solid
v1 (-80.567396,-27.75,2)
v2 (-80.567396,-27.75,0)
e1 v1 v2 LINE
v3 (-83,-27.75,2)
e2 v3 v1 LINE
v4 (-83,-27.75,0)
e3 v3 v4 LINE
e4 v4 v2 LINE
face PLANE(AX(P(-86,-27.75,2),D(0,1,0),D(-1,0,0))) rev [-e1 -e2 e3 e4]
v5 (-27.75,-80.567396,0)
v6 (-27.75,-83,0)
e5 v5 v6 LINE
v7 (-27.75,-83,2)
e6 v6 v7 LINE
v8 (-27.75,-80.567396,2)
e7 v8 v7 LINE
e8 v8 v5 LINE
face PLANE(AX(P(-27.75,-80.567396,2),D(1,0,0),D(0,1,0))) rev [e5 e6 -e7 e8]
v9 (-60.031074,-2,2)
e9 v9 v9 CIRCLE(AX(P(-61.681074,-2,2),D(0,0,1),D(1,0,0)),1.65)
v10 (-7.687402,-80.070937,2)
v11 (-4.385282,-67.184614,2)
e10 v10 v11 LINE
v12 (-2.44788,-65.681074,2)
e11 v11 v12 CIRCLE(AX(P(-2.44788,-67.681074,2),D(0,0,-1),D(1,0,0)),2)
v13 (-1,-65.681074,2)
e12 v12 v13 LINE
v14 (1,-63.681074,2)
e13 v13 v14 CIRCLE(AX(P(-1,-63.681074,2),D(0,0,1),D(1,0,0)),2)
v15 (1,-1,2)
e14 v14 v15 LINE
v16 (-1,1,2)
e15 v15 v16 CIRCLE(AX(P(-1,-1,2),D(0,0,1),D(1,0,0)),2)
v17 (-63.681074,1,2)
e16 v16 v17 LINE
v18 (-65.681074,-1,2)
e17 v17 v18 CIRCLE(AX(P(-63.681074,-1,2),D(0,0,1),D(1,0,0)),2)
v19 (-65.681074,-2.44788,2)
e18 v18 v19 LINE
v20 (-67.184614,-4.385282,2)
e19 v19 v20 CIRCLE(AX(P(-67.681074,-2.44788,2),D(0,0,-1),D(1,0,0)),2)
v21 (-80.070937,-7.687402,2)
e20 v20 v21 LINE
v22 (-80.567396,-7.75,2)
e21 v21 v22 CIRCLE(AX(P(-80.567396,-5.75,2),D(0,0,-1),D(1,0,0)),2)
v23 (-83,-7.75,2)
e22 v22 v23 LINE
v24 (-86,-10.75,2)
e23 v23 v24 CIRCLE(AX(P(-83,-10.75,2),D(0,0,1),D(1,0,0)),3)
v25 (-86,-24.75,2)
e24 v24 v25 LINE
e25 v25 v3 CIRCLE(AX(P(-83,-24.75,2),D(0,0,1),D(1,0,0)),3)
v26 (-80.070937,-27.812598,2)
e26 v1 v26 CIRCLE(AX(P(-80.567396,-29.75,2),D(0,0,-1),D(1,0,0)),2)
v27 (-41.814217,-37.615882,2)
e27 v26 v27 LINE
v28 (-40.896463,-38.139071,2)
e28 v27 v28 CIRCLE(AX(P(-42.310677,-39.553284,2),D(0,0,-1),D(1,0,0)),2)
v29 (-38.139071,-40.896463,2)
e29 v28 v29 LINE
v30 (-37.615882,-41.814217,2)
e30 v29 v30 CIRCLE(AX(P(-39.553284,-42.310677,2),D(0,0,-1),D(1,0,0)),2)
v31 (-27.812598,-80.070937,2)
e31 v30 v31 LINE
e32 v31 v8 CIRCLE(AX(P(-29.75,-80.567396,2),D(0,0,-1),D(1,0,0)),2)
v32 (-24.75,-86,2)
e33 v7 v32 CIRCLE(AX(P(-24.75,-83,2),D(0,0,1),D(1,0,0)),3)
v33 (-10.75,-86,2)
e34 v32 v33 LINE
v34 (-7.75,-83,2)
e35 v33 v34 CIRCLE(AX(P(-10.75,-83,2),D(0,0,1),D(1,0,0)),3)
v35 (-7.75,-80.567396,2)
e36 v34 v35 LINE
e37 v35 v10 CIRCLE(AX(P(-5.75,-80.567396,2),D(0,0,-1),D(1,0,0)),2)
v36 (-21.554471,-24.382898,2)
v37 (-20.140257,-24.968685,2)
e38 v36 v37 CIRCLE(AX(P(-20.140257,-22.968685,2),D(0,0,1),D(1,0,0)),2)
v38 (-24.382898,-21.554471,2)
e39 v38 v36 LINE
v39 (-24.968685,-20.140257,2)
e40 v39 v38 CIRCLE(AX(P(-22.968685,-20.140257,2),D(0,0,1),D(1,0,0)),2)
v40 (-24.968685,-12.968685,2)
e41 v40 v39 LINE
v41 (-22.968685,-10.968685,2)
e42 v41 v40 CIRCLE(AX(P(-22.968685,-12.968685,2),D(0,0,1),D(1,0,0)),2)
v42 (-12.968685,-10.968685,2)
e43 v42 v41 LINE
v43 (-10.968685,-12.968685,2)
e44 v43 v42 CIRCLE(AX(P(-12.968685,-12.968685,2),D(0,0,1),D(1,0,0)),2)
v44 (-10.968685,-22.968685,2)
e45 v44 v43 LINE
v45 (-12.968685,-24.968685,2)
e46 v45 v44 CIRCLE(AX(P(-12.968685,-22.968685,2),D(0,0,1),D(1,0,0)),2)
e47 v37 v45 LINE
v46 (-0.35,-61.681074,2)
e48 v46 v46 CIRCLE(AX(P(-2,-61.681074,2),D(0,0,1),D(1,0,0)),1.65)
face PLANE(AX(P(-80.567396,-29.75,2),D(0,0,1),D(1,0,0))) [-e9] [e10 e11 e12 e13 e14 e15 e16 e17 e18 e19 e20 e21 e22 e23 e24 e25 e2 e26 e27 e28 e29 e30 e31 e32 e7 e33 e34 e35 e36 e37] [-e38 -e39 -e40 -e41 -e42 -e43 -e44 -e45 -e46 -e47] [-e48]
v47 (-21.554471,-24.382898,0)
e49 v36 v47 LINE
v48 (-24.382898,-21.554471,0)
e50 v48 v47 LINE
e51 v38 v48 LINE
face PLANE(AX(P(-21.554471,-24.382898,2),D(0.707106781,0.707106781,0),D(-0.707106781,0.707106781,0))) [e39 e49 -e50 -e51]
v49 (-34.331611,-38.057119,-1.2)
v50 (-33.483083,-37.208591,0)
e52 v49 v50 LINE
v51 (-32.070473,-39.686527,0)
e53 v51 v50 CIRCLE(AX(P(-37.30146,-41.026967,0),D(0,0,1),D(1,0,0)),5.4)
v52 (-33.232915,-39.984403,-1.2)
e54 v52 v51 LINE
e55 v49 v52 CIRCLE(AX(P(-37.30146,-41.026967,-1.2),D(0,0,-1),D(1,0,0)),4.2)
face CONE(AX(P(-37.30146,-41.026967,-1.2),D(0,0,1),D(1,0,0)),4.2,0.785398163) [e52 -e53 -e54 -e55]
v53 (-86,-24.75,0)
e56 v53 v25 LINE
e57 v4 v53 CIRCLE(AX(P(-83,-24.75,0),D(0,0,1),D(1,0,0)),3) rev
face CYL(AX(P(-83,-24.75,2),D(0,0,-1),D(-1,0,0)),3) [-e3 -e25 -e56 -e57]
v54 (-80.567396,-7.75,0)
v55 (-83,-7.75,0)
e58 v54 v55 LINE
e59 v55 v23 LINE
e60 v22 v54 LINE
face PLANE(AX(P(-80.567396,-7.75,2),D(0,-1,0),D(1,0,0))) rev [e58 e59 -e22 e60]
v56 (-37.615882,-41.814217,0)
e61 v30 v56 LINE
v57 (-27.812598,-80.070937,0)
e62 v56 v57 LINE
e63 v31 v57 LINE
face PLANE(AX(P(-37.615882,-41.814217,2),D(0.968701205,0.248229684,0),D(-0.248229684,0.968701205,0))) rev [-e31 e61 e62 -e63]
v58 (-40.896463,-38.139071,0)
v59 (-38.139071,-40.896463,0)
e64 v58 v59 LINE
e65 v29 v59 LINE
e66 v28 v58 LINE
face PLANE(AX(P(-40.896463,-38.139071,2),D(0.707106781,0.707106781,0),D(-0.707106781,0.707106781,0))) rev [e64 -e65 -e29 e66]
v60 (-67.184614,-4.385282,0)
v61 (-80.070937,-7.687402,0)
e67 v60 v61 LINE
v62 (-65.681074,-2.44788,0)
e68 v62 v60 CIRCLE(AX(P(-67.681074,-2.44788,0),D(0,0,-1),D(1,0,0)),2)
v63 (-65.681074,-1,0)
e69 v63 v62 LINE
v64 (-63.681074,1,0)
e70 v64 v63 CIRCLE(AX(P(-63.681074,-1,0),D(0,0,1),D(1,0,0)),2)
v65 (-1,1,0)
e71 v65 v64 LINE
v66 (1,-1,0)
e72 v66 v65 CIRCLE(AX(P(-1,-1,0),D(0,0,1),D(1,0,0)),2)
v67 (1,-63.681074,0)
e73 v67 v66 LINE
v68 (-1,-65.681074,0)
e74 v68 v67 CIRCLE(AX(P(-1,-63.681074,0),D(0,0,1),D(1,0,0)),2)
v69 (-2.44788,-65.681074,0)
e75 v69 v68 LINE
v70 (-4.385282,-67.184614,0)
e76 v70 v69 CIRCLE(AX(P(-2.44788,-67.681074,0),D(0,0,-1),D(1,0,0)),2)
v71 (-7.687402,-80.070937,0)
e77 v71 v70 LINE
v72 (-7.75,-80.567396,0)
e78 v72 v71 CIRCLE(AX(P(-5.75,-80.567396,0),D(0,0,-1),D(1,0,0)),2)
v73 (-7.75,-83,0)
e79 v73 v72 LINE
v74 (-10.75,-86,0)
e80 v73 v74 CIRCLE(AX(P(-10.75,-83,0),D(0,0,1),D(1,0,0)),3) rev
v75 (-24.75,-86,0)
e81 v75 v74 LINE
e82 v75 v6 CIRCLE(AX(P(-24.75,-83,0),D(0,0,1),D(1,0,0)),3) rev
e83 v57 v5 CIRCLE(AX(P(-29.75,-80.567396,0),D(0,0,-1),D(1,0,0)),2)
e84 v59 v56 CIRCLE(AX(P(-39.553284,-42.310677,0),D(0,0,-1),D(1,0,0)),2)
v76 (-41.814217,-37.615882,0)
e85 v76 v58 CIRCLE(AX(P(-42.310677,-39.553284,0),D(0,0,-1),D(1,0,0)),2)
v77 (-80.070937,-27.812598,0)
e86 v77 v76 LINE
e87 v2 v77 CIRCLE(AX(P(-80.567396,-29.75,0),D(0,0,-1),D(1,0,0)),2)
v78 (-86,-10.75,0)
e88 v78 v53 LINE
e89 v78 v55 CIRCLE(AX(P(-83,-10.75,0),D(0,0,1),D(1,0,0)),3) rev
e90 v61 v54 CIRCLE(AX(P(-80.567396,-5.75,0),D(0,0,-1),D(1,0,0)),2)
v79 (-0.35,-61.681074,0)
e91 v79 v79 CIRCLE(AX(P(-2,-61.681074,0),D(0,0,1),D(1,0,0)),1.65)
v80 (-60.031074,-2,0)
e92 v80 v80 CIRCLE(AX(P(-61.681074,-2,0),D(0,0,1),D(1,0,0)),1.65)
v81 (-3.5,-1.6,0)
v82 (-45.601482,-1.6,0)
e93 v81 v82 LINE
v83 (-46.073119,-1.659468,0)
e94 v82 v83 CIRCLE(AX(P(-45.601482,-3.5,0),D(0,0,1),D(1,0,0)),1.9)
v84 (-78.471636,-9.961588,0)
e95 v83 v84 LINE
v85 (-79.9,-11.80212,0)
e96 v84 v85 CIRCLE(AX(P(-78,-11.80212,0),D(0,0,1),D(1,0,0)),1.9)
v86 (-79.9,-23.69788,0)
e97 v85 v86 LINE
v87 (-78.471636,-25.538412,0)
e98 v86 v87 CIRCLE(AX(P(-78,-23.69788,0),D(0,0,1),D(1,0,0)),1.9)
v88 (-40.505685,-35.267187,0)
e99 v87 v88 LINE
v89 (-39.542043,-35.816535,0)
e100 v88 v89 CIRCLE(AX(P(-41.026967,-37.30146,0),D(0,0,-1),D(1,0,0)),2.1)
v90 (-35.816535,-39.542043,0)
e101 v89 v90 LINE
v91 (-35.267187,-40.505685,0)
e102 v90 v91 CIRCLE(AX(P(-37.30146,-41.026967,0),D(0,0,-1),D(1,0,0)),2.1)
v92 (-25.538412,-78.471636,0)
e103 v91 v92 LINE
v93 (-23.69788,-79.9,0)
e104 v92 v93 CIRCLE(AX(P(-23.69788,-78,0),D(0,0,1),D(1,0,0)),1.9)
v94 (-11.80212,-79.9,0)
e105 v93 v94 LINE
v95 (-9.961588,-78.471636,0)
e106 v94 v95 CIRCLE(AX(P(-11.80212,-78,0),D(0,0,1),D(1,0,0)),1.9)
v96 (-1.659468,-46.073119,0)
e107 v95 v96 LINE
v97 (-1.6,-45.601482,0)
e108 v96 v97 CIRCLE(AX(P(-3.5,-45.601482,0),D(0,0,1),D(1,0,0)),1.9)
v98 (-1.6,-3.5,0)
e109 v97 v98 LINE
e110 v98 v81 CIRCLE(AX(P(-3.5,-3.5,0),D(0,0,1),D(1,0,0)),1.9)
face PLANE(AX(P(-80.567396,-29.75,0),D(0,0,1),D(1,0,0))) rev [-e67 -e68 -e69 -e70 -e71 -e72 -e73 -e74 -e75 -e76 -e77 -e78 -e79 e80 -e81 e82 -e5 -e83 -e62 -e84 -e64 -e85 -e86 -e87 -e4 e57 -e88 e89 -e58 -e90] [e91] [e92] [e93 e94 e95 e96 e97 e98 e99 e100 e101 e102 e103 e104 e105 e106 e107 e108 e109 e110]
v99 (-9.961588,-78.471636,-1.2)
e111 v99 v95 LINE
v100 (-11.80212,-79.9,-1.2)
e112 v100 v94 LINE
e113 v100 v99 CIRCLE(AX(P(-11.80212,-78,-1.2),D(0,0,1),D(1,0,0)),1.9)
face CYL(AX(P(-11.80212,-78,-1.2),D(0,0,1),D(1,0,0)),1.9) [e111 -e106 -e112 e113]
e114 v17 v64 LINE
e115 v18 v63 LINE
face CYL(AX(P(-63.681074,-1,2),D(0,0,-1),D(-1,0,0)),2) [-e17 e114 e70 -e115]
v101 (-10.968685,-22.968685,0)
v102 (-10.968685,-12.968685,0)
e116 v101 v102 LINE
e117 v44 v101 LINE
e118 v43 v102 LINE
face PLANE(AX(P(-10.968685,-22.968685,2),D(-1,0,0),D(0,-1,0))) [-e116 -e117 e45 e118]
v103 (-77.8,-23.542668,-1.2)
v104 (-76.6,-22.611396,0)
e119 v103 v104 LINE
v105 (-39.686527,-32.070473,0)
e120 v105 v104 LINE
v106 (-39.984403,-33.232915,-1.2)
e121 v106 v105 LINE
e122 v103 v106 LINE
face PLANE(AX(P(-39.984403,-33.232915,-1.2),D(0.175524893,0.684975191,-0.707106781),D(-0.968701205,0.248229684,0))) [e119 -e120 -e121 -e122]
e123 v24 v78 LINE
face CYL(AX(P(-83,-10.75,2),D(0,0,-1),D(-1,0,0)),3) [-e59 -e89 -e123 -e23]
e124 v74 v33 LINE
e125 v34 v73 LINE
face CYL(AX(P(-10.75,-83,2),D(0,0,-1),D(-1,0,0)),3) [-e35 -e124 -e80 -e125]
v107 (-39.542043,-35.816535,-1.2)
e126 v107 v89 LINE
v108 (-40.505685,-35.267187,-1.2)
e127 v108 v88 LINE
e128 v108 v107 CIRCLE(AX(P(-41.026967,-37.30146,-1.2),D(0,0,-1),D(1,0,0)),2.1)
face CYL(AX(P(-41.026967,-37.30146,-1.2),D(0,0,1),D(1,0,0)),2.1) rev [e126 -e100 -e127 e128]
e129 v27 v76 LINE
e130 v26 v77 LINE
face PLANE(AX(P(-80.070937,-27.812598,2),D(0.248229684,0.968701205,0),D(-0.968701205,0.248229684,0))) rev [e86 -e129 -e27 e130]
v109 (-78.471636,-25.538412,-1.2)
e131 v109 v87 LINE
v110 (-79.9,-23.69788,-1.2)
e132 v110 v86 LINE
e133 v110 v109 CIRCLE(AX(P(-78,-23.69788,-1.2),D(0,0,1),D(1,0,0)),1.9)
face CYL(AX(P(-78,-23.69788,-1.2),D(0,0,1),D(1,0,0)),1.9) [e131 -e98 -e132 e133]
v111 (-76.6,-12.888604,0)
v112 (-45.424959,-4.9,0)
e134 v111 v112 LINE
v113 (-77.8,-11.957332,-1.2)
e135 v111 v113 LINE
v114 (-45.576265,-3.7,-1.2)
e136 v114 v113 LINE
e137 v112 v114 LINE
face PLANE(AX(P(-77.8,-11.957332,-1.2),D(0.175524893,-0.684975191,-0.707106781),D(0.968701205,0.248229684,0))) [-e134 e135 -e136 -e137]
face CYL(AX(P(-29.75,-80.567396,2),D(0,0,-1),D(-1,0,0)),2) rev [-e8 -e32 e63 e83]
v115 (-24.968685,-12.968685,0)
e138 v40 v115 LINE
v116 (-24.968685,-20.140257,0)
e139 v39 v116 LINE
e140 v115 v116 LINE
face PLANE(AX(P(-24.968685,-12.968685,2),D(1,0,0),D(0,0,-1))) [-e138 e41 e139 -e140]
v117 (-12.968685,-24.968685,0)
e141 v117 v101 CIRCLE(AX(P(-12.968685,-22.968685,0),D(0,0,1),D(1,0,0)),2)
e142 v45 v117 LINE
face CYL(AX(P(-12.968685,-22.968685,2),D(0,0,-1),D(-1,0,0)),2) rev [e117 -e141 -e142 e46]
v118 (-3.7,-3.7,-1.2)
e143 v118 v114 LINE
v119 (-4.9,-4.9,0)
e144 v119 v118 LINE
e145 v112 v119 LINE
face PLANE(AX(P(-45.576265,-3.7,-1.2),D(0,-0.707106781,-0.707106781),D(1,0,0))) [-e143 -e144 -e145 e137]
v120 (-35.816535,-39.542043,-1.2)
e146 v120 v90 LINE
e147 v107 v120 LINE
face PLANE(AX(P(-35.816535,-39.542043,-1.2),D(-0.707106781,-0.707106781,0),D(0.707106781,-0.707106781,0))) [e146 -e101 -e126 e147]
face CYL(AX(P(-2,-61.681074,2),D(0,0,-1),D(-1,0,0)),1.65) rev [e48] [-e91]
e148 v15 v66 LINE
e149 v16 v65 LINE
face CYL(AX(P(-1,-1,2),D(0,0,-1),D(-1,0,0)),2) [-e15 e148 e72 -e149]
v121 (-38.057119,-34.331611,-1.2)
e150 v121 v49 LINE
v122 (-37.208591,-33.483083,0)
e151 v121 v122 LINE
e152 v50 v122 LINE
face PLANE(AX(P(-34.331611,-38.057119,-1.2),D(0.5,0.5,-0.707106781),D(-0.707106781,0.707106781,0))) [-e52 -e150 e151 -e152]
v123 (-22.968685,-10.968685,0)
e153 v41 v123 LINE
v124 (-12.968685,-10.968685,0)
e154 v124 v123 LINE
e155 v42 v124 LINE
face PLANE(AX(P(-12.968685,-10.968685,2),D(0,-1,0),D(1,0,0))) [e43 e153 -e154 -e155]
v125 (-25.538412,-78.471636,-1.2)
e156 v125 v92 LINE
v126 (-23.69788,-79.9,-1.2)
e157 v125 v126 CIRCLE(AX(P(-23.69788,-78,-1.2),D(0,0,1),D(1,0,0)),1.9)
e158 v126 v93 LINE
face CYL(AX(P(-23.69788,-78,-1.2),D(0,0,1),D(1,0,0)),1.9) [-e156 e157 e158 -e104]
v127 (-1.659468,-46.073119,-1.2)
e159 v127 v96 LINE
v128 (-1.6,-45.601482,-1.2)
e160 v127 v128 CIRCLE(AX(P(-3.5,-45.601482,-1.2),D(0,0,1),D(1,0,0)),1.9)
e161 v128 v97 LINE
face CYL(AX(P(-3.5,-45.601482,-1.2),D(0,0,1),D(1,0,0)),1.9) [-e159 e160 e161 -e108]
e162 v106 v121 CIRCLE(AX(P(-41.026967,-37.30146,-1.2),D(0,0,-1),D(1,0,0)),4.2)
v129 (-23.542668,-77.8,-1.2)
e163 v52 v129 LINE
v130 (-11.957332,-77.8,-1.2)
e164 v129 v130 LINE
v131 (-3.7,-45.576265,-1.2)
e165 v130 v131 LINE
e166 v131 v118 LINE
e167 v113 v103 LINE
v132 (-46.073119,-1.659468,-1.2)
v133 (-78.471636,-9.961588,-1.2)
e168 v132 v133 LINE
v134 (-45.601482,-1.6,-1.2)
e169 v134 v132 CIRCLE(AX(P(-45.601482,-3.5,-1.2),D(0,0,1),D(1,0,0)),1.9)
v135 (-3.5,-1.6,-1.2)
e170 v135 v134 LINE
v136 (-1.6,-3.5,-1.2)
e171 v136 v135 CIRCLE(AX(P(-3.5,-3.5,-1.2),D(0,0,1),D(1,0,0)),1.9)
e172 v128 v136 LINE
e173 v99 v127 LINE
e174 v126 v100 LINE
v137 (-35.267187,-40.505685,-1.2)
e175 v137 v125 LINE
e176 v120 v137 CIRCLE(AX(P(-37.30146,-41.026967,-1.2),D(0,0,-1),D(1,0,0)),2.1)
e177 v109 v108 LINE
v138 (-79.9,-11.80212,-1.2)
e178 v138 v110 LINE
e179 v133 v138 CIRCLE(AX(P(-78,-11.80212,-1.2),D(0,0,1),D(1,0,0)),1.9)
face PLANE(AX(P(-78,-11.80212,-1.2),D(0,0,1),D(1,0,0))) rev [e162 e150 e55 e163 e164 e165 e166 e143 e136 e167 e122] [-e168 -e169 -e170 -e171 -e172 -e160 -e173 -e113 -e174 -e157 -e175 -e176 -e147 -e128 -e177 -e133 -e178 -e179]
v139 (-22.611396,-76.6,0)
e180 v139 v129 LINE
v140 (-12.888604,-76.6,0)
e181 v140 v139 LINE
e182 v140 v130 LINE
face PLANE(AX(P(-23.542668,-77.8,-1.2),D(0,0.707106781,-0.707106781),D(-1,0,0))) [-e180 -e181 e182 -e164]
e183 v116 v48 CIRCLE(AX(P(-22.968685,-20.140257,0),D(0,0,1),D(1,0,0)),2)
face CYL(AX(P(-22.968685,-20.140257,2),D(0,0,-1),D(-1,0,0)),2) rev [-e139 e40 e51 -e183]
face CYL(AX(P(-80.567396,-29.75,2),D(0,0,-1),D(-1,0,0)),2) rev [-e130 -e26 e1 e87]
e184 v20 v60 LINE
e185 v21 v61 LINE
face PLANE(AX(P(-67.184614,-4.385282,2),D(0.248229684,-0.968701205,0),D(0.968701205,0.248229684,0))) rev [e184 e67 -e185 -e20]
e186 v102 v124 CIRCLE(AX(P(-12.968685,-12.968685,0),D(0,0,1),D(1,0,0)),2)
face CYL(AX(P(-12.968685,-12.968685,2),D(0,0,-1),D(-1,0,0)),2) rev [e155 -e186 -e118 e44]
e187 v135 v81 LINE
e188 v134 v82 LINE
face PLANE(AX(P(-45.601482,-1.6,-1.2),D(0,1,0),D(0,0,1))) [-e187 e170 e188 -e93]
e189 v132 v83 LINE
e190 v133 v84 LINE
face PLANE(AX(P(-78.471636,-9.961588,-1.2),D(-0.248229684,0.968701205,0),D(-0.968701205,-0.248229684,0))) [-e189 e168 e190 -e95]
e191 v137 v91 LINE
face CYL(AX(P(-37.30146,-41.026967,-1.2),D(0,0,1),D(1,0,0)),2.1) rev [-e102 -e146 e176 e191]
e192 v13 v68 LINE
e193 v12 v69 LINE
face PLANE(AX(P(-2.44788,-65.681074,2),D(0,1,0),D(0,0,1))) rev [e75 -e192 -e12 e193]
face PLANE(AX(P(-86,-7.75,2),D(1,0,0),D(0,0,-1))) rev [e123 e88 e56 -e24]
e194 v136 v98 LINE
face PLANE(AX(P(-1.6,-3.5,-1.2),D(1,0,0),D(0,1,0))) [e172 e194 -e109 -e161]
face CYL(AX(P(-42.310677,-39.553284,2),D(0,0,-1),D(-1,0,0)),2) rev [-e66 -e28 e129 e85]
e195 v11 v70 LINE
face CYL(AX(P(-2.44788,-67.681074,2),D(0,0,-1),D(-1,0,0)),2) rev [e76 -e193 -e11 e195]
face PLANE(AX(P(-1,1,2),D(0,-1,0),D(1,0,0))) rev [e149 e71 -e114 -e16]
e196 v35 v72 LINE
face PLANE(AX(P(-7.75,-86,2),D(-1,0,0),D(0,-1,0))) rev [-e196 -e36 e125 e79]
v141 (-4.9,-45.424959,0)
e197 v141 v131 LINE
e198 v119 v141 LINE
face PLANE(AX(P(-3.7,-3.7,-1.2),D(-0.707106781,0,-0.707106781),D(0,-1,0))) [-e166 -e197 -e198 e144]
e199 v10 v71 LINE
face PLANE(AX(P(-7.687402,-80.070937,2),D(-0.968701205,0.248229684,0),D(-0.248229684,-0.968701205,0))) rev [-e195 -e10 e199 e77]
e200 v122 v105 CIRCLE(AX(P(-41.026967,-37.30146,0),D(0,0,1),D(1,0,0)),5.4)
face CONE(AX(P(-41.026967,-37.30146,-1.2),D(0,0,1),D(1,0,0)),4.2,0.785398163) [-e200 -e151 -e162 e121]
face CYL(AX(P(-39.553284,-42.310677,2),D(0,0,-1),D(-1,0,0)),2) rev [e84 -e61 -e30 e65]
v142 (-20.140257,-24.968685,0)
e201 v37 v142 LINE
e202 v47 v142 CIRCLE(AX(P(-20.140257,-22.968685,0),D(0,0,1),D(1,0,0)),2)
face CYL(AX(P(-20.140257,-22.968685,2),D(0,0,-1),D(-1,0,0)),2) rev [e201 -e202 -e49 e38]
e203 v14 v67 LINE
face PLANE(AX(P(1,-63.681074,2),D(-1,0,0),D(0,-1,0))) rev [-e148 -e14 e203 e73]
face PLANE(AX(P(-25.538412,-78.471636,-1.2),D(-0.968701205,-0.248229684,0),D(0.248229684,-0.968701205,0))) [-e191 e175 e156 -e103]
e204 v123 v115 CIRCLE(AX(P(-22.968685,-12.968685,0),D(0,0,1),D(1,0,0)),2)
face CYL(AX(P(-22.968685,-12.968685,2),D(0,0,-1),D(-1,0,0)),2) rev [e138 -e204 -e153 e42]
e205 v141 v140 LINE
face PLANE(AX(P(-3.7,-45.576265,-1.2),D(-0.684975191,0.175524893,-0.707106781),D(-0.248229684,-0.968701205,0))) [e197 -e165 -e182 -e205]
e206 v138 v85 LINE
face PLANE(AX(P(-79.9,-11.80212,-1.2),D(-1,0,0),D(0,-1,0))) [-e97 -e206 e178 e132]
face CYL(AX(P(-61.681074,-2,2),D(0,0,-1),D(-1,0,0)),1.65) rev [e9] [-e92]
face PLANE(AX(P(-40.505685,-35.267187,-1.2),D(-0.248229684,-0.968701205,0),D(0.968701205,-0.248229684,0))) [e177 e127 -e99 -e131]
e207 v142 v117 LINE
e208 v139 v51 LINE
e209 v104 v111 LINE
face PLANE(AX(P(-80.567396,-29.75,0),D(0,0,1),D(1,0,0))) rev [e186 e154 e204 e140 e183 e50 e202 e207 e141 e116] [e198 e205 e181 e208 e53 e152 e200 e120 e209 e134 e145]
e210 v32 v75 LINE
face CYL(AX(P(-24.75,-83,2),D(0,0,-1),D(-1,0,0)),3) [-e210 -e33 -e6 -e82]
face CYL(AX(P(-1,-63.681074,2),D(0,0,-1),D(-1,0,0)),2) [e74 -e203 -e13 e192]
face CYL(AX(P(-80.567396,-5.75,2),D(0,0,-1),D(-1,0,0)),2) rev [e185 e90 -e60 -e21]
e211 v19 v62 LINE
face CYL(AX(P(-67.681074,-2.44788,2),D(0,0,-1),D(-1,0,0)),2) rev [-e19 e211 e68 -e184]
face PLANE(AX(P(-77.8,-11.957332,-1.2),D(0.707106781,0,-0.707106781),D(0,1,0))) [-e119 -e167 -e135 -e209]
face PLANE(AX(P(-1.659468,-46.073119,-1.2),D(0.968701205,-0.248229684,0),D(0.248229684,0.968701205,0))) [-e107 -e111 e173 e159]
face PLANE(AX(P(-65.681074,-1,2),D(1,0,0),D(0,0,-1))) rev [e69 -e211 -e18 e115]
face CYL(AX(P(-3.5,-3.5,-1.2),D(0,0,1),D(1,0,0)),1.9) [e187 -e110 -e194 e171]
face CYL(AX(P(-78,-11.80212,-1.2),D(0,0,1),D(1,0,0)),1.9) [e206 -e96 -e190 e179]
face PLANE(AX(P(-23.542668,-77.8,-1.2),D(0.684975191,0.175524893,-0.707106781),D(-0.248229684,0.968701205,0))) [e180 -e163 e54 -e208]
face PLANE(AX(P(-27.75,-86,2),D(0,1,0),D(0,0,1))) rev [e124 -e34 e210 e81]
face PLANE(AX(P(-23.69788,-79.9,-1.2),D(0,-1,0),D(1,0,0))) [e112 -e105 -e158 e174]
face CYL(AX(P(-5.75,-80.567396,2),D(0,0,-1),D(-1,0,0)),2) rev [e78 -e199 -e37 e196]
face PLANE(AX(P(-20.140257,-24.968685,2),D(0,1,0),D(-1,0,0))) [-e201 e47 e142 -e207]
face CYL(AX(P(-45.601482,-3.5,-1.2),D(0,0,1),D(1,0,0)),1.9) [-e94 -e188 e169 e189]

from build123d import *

# Parameters (mm, degrees)
BOSS_EXTRUDE1_DEPTH = 2
CUT_EXTRUDE2_DEPTH  = 122.638809596
BOSS_EXTRUDE2_DEPTH = 1.2
CHAMFER1_SIZE       = 1.2
SKETCH2_R           = 1.65
CUT_EXTRUDE3_DEPTH  = 122.638809596
FILLET1_R           = 3


with BuildPart() as part:
    # Sketch1 → Boss-Extrude1 (new body)
    with BuildSketch(Plane.XY):
        with BuildLine():
            Line((-86, -7.75), (-86, -27.75))
            Line((-86, -27.75), (-80.567396197, -27.75))
            ThreePointArc((-80.567396197, -27.75), (-80.317201092, -27.765711107), (-80.07093683, -27.81259759))
            Line((-80.07093683, -27.81259759), (-41.814217278, -37.615881976))
            ThreePointArc((-41.814217278, -37.615881976), (-41.320172025, -37.815786012), (-40.896463083, -38.139070823))
            Line((-40.896463083, -38.139070823), (-38.139070823, -40.896463083))
            ThreePointArc((-38.139070823, -40.896463083), (-37.815786012, -41.320172025), (-37.615881976, -41.814217278))
            Line((-37.615881976, -41.814217278), (-27.81259759, -80.07093683))
            ThreePointArc((-27.81259759, -80.07093683), (-27.765711107, -80.317201092), (-27.75, -80.567396197))
            Line((-27.75, -80.567396197), (-27.75, -86))
            Line((-27.75, -86), (-7.75, -86))
            Line((-7.75, -86), (-7.75, -80.567396197))
            ThreePointArc((-7.75, -80.567396197), (-7.734288893, -80.317201092), (-7.68740241, -80.07093683))
            Line((-7.68740241, -80.07093683), (-4.385282287, -67.184614401))
            ThreePointArc((-4.385282287, -67.184614401), (-3.674069354, -66.101054981), (-2.447879878, -65.681073768))
            Line((-2.447879878, -65.681073768), (-1, -65.681073768))
            ThreePointArc((-1, -65.681073768), (0.414213562, -65.09528733), (1, -63.681073768))
            Line((1, -63.681073768), (1, -1))
            ThreePointArc((1, -1), (0.414213562, 0.414213562), (-1, 1))
            Line((-1, 1), (-63.681073768, 1))
            ThreePointArc((-63.681073768, 1), (-65.09528733, 0.414213562), (-65.681073768, -1))
            Line((-65.681073768, -1), (-65.681073768, -2.447879878))
            ThreePointArc((-65.681073768, -2.447879878), (-66.101054981, -3.674069354), (-67.184614401, -4.385282287))
            Line((-67.184614401, -4.385282287), (-80.07093683, -7.68740241))
            ThreePointArc((-80.07093683, -7.68740241), (-80.317201092, -7.734288893), (-80.567396197, -7.75))
            Line((-80.567396197, -7.75), (-86, -7.75))
        make_face()
    extrude(amount=BOSS_EXTRUDE1_DEPTH)

    # Sketch4 → Cut-Extrude2 (cut, through all)
    with BuildSketch(Plane.XY):
        with BuildLine():
            Line((-24.968684618, -12.968684618), (-24.968684618, -20.140257493))
            ThreePointArc((-24.968684618, -20.140257493), (-24.816443683, -20.905624358), (-24.38289818, -21.554471055))
            Line((-24.38289818, -21.554471055), (-21.554471055, -24.38289818))
            ThreePointArc((-21.554471055, -24.38289818), (-20.905624358, -24.816443683), (-20.140257493, -24.968684618))
            Line((-20.140257493, -24.968684618), (-12.968684618, -24.968684618))
            ThreePointArc((-12.968684618, -24.968684618), (-11.554471055, -24.38289818), (-10.968684618, -22.968684618))
            Line((-10.968684618, -22.968684618), (-10.968684618, -12.968684618))
            ThreePointArc((-10.968684618, -12.968684618), (-11.554471055, -11.554471055), (-12.968684618, -10.968684618))
            Line((-12.968684618, -10.968684618), (-22.968684618, -10.968684618))
            ThreePointArc((-22.968684618, -10.968684618), (-24.38289818, -11.554471055), (-24.968684618, -12.968684618))
        make_face()
    extrude(amount=CUT_EXTRUDE2_DEPTH, mode=Mode.SUBTRACT)

    # Sketch5 → Boss-Extrude2 (add)
    with BuildSketch(Plane.XY):
        with BuildLine():
            Line((-78.471636399, -9.961587833), (-46.073118848, -1.659467711))
            ThreePointArc((-46.073118848, -1.659467711), (-45.839167799, -1.614925552), (-45.601482449, -1.6))
            Line((-45.601482449, -1.6), (-3.5, -1.6))
            ThreePointArc((-3.5, -1.6), (-2.156497116, -2.156497116), (-1.6, -3.5))
            Line((-1.6, -3.5), (-1.6, -45.601482449))
            ThreePointArc((-1.6, -45.601482449), (-1.614925552, -45.839167799), (-1.659467711, -46.073118848))
            Line((-1.659467711, -46.073118848), (-9.961587833, -78.471636399))
            ThreePointArc((-9.961587833, -78.471636399), (-10.63724012, -79.501017848), (-11.802120122, -79.9))
            Line((-11.802120122, -79.9), (-23.697879878, -79.9))
            ThreePointArc((-23.697879878, -79.9), (-24.86275988, -79.501017848), (-25.538412167, -78.471636399))
            Line((-25.538412167, -78.471636399), (-35.267187197, -40.505685062))
            ThreePointArc((-35.267187197, -40.505685062), (-35.477086435, -39.986937546), (-35.816535486, -39.542043158))
            Line((-35.816535486, -39.542043158), (-39.542043158, -35.816535486))
            ThreePointArc((-39.542043158, -35.816535486), (-39.986937546, -35.477086435), (-40.505685062, -35.267187197))
            Line((-40.505685062, -35.267187197), (-78.471636399, -25.538412167))
            ThreePointArc((-78.471636399, -25.538412167), (-79.501017848, -24.86275988), (-79.9, -23.697879877))
            Line((-79.9, -23.697879877), (-79.9, -11.802120122))
            ThreePointArc((-79.9, -11.802120122), (-79.501017848, -10.63724012), (-78.471636399, -9.961587833))
        make_face()
        with BuildLine():
            Line((-77.8, -11.957332135), (-77.8, -23.542667865))
            Line((-77.8, -23.542667865), (-39.984402726, -33.232914667))
            ThreePointArc((-39.984402726, -33.232914667), (-38.946907695, -33.652713143), (-38.057118917, -34.331611246))
            Line((-38.057118917, -34.331611246), (-34.331611246, -38.057118917))
            ThreePointArc((-34.331611246, -38.057118917), (-33.652713143, -38.946907695), (-33.232914667, -39.984402726))
            Line((-33.232914667, -39.984402726), (-23.542667865, -77.8))
            Line((-23.542667865, -77.8), (-11.957332135, -77.8))
            Line((-11.957332135, -77.8), (-3.7, -45.57626484))
            Line((-3.7, -45.57626484), (-3.7, -3.7))
            Line((-3.7, -3.7), (-45.57626484, -3.7))
            Line((-45.57626484, -3.7), (-77.8, -11.957332135))
        make_face(mode=Mode.SUBTRACT)
    extrude(amount=-BOSS_EXTRUDE2_DEPTH)

    # Chamfer1
    chamfer1_edges = [part.edges().sort_by_distance(p)[0] for p in [
        (-28.387791266, -58.892201363, 0),
        (-33.652713143, -38.946907695, 0),
        (-36.194365081, -36.194365081, 0),
        (-38.946907695, -33.652713143, 0),
        (-17.75, -77.8, 0),
        (-7.828666067, -61.68813242, 0),
        (-3.7, -24.63813242, 0),
        (-24.63813242, -3.7, 0),
        (-61.68813242, -7.828666067, 0),
        (-77.8, -17.75, 0),
        (-58.892201363, -28.387791266, 0),
    ]]
    chamfer(chamfer1_edges, length=CHAMFER1_SIZE - 0.0001)  # a hair under: the kernel refuses the full size

    # Sketch2 → Cut-Extrude3 (cut, through all)
    with BuildSketch(Plane.XY):
        with Locations((-61.681073768, -2)):
            Circle(SKETCH2_R)
        with Locations((-2, -61.681073768)):
            Circle(SKETCH2_R)
    extrude(amount=CUT_EXTRUDE3_DEPTH, mode=Mode.SUBTRACT)

    # Fillet1
    fillet1_edges = [part.edges().sort_by_distance(p)[0] for p in [
        (-7.75, -86, 1),
        (-27.75, -86, 1),
        (-86, -27.75, 1),
        (-86, -7.75, 1),
    ]]
    fillet(fillet1_edges, radius=FILLET1_R)


solid = part.part
